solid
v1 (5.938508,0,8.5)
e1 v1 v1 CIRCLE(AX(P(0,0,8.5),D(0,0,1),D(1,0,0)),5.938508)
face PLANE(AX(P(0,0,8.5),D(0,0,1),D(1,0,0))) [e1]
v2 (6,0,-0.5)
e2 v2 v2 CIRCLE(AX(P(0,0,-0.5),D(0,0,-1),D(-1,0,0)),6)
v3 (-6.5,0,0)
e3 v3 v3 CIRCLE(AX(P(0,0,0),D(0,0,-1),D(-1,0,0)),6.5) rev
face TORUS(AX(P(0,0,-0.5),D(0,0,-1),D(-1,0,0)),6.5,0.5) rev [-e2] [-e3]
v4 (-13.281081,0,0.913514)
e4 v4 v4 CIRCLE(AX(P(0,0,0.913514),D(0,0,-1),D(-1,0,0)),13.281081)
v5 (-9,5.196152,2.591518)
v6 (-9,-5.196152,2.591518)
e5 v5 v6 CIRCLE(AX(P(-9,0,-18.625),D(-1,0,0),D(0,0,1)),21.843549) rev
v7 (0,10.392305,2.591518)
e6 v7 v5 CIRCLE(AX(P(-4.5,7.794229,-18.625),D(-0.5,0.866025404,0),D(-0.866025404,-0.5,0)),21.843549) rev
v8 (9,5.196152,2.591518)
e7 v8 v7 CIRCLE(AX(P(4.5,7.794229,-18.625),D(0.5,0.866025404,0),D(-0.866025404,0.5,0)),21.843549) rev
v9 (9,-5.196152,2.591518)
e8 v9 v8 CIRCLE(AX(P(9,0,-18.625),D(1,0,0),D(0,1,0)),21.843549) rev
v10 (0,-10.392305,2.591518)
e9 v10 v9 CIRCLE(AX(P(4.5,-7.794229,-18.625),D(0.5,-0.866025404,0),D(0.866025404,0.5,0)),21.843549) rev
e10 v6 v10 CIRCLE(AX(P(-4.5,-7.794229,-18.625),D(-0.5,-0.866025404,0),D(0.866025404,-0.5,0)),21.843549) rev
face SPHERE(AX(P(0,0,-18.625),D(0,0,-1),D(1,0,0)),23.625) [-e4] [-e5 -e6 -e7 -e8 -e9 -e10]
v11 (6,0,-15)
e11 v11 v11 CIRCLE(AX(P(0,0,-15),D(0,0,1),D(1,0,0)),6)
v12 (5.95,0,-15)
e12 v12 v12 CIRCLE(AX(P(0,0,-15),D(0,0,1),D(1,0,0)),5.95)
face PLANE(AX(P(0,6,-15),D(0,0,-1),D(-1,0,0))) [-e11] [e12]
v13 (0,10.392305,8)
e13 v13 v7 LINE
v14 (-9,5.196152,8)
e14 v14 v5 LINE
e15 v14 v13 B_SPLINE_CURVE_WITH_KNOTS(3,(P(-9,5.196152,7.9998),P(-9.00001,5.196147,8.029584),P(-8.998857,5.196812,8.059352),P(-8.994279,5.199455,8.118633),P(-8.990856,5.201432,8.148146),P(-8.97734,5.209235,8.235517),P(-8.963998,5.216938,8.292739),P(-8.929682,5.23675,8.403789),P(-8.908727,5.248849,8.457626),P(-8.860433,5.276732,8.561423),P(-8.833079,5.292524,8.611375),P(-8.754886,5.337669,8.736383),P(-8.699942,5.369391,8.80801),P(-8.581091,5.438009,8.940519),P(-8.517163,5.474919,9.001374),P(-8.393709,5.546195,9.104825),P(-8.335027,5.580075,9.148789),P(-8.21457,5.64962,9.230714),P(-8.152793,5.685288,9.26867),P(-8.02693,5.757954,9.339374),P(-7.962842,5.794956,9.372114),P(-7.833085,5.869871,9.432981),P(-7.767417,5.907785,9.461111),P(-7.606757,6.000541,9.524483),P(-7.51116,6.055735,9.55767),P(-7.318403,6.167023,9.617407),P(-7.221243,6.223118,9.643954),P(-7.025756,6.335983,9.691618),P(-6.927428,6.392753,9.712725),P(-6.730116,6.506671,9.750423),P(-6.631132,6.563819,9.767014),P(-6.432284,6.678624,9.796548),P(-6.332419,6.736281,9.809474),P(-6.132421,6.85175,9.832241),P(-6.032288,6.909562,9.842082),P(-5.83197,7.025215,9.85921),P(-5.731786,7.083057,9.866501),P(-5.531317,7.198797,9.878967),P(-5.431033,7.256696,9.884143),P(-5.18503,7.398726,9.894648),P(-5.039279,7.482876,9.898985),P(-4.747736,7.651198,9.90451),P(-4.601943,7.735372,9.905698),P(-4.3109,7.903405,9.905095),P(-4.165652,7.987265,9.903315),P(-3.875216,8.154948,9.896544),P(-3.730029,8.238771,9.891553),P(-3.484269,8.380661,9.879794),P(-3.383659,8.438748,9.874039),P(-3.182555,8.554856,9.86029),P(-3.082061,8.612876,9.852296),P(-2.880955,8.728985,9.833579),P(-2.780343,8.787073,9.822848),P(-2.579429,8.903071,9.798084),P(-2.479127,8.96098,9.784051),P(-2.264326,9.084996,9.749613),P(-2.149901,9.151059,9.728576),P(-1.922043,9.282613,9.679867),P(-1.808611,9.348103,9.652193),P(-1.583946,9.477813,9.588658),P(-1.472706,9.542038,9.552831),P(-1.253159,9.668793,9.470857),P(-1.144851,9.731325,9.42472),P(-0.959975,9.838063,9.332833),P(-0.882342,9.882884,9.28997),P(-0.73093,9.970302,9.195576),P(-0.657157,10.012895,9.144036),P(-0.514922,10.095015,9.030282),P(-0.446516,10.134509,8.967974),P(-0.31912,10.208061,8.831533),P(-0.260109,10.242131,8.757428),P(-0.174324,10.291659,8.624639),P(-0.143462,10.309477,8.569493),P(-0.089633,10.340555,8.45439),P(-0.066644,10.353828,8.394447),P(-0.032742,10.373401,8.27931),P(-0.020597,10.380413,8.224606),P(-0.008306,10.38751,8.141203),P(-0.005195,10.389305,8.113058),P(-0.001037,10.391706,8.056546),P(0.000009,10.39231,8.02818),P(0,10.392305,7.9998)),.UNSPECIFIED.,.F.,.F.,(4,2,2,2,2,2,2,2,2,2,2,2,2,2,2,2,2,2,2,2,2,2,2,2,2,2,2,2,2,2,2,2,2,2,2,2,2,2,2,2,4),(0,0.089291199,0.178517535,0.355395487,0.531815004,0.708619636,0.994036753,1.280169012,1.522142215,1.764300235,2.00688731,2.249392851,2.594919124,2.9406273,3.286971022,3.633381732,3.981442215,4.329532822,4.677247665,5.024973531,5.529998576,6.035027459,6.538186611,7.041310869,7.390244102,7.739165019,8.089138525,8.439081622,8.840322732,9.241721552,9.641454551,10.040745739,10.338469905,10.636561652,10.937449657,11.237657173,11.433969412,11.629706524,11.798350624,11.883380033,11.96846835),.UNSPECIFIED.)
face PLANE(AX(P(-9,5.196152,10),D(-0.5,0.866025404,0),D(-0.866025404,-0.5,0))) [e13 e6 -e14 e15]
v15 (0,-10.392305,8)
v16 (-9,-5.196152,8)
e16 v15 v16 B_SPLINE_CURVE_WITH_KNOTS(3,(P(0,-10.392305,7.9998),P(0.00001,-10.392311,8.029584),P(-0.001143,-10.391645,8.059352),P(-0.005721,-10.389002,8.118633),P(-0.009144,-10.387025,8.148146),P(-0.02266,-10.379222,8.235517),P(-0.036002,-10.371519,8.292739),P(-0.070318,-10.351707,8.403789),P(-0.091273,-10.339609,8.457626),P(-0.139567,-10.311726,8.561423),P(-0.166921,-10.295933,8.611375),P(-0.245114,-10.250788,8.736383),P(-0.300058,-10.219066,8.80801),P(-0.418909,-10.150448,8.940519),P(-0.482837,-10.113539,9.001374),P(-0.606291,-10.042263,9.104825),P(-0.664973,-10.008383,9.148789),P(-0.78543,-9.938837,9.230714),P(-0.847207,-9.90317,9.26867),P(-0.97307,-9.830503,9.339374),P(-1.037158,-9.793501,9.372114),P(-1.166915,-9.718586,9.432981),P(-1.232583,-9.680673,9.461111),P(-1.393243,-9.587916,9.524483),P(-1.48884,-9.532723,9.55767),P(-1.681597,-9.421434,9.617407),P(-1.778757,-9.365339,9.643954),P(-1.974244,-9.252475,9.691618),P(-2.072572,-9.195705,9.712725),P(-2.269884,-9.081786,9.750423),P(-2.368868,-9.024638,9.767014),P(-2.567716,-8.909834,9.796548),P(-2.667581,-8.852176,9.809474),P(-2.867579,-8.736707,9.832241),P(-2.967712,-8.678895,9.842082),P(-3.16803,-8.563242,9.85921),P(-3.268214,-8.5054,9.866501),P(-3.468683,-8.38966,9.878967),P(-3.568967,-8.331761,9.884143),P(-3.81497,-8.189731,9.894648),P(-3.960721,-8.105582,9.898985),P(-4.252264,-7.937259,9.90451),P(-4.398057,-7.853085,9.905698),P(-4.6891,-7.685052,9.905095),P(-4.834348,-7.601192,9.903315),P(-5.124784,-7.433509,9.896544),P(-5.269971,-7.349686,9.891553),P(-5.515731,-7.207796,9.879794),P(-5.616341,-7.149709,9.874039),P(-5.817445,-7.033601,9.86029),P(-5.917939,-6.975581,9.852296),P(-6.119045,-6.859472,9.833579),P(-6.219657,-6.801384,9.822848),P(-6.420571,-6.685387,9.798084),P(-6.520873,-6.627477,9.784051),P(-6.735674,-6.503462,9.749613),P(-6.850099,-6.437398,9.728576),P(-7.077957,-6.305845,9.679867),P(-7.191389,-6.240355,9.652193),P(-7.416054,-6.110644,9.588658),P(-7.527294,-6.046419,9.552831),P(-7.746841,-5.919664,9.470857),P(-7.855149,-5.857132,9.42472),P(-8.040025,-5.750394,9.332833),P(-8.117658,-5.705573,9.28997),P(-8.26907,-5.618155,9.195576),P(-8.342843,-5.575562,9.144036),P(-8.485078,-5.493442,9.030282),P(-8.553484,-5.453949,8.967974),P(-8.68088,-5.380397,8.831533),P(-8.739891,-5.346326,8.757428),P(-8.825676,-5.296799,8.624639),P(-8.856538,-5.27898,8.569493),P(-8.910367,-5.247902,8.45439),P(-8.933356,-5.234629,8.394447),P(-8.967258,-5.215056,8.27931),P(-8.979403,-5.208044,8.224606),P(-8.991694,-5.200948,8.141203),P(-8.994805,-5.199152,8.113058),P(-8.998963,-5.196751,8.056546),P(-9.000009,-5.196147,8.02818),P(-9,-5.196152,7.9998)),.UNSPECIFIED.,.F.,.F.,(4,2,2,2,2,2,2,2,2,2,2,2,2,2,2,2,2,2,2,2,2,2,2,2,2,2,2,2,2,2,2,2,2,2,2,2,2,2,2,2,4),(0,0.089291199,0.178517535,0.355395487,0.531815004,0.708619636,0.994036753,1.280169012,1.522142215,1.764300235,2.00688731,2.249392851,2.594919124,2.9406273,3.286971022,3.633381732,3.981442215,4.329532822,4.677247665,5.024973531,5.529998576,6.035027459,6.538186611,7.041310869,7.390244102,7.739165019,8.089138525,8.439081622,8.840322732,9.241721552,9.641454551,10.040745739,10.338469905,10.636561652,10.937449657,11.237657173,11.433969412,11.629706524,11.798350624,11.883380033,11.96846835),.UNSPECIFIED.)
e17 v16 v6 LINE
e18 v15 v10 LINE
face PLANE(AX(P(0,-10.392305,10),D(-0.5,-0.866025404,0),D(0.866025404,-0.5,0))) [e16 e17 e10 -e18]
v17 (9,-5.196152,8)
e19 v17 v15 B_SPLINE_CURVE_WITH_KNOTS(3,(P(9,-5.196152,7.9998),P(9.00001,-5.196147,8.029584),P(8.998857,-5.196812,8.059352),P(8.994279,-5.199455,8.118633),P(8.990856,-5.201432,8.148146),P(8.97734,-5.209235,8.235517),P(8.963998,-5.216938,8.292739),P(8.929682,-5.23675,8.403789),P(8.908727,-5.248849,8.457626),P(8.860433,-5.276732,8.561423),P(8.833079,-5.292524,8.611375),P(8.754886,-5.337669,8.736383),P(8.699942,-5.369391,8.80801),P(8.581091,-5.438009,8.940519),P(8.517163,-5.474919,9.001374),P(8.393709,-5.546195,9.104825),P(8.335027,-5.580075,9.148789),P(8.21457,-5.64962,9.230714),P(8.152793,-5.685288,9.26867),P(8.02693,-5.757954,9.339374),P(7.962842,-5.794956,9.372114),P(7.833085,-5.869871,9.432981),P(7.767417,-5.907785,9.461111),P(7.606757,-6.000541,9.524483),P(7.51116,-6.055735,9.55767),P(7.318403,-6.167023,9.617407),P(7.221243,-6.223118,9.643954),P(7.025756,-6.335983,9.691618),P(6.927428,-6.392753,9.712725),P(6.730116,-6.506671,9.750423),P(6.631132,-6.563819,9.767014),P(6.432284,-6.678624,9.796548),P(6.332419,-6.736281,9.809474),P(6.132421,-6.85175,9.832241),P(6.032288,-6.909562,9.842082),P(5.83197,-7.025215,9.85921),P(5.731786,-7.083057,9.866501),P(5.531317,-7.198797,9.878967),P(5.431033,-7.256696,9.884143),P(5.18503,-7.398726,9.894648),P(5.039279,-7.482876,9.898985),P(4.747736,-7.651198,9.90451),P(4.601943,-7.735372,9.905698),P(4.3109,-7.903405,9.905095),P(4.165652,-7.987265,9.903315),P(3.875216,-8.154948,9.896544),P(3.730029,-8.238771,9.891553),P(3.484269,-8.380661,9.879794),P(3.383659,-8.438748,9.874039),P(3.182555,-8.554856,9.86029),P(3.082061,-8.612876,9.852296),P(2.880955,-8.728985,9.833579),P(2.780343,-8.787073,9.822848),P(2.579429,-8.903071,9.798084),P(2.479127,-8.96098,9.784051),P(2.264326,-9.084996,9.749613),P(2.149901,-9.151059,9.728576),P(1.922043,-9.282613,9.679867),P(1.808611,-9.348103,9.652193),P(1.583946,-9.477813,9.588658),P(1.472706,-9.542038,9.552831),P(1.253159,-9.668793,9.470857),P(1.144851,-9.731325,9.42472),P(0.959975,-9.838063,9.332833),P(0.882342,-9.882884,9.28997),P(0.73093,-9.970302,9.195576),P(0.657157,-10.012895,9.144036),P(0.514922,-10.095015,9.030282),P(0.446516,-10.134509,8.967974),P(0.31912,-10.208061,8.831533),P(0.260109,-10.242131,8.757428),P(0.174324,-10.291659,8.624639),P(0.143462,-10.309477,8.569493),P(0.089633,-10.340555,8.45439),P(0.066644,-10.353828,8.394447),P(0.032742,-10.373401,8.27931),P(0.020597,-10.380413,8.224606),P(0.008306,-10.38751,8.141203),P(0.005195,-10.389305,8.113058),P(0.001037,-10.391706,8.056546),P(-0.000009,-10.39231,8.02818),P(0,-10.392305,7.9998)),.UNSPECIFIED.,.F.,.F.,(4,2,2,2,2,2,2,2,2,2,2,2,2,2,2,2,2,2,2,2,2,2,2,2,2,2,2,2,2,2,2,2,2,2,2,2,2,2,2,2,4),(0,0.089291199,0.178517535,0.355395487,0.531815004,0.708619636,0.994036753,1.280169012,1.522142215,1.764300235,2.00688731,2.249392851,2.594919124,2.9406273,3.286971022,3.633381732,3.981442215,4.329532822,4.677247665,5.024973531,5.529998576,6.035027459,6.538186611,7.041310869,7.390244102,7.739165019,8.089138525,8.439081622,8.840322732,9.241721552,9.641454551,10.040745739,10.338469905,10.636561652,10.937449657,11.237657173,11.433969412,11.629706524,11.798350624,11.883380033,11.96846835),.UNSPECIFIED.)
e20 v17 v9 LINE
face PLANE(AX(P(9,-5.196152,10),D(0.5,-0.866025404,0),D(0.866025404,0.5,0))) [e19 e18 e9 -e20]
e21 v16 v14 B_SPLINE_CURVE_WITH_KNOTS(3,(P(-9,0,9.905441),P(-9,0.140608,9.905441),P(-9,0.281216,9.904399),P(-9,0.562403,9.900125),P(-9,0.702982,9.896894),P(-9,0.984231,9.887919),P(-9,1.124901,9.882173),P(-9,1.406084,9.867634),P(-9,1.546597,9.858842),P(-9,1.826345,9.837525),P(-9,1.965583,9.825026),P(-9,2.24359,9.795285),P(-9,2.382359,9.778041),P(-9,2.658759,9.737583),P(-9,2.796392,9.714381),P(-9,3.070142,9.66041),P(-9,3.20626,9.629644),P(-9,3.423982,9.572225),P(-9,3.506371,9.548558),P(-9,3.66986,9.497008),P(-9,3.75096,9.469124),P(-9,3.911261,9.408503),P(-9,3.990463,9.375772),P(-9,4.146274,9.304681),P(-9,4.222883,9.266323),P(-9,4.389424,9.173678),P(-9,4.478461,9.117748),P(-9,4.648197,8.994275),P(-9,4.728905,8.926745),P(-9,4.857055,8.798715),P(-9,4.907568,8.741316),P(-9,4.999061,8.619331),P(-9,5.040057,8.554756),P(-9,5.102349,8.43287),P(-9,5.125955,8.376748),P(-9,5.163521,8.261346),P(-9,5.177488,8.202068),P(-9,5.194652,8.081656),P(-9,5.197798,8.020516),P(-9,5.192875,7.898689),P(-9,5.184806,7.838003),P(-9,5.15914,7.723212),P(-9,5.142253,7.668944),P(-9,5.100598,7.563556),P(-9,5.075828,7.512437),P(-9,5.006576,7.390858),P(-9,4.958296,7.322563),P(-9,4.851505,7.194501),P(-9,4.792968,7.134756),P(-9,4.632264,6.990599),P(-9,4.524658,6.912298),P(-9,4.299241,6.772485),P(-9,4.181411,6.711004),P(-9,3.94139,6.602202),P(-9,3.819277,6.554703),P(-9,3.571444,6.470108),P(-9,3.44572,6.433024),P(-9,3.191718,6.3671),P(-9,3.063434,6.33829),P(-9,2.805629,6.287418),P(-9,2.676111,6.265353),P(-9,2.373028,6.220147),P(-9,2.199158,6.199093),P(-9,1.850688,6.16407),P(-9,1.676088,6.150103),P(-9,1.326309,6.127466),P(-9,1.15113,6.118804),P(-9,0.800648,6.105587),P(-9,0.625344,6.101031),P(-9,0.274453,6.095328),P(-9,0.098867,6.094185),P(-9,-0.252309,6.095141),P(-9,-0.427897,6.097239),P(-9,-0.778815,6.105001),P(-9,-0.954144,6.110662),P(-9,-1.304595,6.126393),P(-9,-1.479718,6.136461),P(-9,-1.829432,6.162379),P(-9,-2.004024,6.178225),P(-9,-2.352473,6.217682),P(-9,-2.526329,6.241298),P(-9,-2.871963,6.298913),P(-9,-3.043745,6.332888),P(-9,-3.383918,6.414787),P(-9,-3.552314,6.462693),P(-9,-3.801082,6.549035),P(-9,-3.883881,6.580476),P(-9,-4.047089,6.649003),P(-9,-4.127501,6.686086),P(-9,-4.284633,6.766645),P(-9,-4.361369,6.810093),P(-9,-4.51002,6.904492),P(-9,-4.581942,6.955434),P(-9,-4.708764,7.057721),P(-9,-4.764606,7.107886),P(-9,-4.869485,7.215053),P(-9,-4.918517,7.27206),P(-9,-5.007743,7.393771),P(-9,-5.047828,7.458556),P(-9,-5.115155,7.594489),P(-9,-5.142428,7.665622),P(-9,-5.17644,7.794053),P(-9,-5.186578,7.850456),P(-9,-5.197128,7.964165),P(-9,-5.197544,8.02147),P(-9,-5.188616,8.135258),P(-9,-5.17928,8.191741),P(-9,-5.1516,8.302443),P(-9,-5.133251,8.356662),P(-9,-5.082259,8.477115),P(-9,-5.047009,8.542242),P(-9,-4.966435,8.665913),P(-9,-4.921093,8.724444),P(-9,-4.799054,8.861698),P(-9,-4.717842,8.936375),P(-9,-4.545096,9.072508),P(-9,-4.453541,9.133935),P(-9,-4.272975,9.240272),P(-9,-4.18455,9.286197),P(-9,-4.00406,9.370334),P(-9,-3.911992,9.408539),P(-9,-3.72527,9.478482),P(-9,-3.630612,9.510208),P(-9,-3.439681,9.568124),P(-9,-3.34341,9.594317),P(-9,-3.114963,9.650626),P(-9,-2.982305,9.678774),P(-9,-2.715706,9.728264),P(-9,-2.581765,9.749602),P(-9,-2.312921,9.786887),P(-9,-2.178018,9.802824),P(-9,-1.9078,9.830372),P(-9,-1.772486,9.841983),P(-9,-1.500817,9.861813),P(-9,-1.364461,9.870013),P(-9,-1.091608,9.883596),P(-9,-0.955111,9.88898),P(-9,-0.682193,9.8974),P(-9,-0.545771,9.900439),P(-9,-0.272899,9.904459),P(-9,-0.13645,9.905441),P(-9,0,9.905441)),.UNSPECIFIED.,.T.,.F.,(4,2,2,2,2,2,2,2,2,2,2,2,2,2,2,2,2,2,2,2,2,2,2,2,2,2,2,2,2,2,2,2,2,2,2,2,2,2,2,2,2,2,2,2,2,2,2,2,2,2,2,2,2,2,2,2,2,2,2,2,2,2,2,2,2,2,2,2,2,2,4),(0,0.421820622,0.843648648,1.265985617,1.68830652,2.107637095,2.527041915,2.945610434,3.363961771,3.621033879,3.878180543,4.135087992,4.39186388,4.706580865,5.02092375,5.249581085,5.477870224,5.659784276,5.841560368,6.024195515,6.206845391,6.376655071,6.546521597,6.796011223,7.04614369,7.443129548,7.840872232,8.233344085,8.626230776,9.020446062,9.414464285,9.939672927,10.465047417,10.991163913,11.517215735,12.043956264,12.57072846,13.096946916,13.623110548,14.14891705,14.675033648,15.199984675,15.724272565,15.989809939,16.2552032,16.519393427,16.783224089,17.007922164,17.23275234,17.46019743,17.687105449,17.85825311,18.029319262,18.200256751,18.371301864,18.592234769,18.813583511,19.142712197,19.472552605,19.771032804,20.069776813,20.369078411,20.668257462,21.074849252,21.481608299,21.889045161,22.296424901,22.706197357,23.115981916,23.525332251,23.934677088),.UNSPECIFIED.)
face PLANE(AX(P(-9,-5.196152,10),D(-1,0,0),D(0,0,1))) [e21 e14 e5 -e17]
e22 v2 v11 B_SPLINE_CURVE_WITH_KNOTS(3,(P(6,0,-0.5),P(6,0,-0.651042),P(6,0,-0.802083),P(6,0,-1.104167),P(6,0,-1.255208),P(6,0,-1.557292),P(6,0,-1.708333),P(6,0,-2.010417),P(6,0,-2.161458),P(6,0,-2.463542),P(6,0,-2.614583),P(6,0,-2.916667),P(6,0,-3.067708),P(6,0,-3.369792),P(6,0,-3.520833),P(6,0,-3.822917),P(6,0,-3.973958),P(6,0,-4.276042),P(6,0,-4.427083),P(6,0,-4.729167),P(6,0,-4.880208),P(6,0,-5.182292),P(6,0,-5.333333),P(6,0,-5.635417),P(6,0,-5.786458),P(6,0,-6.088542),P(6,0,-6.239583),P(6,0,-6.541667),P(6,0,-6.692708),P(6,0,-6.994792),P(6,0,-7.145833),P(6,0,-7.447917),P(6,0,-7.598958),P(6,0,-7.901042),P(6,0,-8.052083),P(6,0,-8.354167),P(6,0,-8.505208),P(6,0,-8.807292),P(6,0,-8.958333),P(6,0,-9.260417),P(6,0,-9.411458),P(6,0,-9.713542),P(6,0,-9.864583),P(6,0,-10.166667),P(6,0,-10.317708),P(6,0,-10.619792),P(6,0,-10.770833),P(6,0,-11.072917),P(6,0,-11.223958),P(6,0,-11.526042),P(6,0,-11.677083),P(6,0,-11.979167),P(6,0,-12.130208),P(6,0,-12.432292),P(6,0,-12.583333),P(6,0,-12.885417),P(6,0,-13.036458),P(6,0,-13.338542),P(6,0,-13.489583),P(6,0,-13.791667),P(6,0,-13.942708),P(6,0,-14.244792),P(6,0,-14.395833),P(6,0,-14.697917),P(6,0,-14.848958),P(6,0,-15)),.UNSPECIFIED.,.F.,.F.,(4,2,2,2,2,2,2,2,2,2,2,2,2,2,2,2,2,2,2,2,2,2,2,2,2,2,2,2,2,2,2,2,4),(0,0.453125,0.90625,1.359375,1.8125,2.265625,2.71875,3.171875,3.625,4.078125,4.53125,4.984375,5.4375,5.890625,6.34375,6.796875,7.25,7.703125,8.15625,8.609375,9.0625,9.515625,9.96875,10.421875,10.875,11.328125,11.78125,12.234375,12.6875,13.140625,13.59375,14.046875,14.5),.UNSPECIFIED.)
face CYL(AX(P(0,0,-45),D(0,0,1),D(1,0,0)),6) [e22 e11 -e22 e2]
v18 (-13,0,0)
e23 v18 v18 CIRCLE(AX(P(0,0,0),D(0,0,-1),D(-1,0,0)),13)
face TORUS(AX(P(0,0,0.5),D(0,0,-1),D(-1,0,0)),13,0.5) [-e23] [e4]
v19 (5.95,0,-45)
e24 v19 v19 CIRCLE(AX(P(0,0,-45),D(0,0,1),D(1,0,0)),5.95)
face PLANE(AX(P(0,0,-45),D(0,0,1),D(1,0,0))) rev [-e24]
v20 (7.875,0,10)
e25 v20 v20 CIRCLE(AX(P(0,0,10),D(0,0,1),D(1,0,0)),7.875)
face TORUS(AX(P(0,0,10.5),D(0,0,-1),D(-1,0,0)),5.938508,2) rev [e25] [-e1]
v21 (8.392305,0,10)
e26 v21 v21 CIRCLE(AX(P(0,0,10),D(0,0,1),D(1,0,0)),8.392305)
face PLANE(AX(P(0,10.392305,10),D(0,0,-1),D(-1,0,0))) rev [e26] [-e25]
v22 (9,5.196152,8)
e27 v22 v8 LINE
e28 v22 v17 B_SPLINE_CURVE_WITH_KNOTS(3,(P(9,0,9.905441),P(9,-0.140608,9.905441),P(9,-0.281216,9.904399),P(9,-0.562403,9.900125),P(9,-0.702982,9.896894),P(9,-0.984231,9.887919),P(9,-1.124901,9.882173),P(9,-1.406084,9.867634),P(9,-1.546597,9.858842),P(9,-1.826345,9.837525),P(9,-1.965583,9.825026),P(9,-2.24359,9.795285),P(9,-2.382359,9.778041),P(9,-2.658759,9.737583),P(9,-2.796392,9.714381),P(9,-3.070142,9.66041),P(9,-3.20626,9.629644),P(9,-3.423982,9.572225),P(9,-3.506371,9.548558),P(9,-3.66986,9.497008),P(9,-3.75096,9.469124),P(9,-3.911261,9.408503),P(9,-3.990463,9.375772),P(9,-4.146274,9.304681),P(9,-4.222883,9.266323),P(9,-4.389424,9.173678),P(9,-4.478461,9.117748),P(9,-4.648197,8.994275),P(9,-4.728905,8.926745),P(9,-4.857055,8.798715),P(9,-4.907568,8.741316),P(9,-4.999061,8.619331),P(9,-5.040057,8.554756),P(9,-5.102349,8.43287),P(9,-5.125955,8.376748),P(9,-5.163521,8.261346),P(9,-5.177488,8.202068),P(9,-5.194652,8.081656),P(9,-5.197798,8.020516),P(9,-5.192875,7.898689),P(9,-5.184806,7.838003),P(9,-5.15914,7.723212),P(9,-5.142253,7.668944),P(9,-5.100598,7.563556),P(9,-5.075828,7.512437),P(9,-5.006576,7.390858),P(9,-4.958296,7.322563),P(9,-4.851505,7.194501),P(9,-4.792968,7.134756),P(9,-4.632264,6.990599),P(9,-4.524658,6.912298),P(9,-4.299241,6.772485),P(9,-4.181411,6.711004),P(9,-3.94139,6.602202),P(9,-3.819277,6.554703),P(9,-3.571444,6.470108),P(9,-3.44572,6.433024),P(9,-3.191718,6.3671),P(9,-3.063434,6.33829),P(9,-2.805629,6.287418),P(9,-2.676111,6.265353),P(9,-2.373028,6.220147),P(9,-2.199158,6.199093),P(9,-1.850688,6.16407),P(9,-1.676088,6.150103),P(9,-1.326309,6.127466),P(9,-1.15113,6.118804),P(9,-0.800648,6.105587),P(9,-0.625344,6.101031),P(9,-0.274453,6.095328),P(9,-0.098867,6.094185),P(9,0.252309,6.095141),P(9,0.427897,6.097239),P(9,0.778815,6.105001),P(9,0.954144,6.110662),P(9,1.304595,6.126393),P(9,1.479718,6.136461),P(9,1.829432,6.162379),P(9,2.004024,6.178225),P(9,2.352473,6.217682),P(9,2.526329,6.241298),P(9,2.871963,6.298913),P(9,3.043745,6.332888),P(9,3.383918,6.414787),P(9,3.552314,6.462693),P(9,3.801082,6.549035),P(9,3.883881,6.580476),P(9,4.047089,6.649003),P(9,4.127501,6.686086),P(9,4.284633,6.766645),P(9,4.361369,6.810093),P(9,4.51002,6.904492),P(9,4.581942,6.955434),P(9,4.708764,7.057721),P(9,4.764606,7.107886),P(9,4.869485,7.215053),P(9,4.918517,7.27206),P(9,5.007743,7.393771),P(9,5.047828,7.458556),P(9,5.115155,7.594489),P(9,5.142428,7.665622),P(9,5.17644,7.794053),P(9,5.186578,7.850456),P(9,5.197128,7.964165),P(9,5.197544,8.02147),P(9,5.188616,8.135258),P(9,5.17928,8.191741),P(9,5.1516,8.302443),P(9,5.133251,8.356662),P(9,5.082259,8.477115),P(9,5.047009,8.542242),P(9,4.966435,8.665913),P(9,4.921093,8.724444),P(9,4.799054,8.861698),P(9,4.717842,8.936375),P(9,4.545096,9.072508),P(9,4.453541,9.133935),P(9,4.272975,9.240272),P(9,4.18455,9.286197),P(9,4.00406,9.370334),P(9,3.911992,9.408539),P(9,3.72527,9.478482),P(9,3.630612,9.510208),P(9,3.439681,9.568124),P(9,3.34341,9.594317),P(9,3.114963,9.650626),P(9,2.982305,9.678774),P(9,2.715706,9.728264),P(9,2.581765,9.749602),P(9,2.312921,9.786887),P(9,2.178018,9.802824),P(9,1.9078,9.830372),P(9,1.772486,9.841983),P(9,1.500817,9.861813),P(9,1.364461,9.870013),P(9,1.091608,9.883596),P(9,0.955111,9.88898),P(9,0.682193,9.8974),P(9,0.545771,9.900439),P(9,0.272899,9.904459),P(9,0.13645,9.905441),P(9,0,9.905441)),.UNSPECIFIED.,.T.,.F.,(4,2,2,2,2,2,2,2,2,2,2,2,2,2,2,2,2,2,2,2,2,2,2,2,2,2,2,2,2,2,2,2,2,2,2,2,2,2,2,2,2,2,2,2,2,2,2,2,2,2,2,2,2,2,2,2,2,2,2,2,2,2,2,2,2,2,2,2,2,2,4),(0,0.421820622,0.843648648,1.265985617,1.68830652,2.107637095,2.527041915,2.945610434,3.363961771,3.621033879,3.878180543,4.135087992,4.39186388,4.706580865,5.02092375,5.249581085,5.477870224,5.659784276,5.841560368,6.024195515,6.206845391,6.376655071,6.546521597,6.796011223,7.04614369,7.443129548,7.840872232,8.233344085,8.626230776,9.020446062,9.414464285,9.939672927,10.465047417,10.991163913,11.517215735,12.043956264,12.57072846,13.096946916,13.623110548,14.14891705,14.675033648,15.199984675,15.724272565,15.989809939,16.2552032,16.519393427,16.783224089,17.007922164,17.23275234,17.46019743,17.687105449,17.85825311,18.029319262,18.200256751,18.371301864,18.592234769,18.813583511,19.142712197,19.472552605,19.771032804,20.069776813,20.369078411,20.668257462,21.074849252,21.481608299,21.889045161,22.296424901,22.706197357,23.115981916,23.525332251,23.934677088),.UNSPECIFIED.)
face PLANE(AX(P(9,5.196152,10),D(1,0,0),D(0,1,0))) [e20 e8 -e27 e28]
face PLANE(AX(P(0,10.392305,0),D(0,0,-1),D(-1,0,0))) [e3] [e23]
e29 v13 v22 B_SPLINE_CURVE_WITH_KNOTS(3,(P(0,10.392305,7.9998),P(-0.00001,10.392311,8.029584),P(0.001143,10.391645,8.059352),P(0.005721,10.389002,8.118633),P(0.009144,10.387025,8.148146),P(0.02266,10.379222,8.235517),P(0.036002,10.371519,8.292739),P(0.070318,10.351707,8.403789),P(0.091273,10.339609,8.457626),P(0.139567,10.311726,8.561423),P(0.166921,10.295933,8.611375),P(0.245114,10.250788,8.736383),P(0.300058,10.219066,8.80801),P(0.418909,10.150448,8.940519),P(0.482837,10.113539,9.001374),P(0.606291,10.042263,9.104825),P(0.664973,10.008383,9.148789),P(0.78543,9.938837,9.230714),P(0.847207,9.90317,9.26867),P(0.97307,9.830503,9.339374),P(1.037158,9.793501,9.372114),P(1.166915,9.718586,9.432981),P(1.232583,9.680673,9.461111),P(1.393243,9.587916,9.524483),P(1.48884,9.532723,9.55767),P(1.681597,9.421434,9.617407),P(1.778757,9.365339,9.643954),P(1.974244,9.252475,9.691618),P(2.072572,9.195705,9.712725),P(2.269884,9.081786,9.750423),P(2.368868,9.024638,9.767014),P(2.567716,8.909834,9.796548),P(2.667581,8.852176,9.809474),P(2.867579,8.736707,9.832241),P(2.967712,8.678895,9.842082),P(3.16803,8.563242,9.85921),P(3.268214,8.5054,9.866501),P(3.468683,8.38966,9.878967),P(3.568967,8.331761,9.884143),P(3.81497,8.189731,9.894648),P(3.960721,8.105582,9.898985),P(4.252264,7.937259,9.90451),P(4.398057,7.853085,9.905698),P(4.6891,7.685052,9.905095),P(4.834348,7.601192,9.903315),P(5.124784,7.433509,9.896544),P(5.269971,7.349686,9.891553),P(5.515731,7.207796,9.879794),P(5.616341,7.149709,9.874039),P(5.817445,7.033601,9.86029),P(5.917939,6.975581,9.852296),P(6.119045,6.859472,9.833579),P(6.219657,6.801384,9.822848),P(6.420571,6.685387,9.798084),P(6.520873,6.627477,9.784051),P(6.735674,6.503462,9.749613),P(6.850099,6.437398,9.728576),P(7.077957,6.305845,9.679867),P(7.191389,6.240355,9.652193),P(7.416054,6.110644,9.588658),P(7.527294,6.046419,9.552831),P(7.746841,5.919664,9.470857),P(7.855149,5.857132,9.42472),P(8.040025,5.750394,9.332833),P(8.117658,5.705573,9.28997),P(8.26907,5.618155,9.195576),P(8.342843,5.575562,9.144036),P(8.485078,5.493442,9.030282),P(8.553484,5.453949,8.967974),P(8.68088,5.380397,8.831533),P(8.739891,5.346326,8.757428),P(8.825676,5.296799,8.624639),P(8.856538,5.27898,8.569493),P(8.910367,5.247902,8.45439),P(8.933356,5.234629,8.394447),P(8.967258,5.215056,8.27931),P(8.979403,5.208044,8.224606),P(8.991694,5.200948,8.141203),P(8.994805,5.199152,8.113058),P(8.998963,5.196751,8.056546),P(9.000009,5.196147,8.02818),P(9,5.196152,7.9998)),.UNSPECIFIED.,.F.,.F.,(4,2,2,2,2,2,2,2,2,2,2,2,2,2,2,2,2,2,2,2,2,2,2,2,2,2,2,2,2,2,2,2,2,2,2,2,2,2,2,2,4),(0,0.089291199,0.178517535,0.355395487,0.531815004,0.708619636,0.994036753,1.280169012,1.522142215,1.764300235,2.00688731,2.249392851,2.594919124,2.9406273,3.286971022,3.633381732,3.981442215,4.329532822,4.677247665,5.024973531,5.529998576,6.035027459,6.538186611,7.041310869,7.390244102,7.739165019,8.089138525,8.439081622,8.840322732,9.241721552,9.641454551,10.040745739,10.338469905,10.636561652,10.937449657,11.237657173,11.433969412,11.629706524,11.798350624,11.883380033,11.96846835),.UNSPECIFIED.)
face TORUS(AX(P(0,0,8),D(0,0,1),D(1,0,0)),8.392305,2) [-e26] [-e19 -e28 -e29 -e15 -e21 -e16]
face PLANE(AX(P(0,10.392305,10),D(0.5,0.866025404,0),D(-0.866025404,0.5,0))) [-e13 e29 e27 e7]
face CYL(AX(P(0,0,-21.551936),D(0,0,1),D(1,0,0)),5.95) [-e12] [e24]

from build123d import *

# Parameters (mm, degrees)
HEAD_DEPTH     = 10
SHANK_SKETCH_R = 6
SHANK_DEPTH    = 45
SKETCH6_R      = 7.875
HEAD_CUT_DEPTH = 1.5
FILLET1_R      = 2
FILLET2_R      = 0.5
THREAD_END_W   = 30
THREAD_END_H   = 0.05


with BuildPart() as part:
    # Head Sketch → Head (new body)
    with BuildSketch(Plane.XY):
        Polygon((0, 10.392304845), (9, 5.196152423), (9, -5.196152423), (0, -10.392304845), (-9, -5.196152423), (-9, 5.196152423), align=None)
    extrude(amount=HEAD_DEPTH)

    # Shank Sketch → Shank (add)
    with BuildSketch(Plane.XY):
        Circle(SHANK_SKETCH_R)
    extrude(amount=-SHANK_DEPTH)

    # Sketch3 → Flange (revolve)
    with BuildSketch(Plane(origin=(0, 0, 0), x_dir=(-1, 0, 0), z_dir=(0, 1, 0)), mode=Mode.PRIVATE) as flange_sk:
        with BuildLine():
            Line((-13, 0), (0, 0))
            Line((0, 0), (0, 5))
            ThreePointArc((0, 5), (-6.947778179, 3.955279081), (-13.281081081, 0.913513514))
            ThreePointArc((-13.281081081, 0.913513514), (-13.477889504, 0.352957076), (-13, 0))
        make_face()
    revolve(flange_sk.sketch.rotate(Axis((0, 0, 0), (0, 0, 1)), 30), axis=Axis((0, 0, 0), (0, 0, 1)))

    # Sketch5 → Head Trim (revolve, cut)
    with BuildSketch(Plane(origin=(0, 0, 0), x_dir=(0, 0, -1), z_dir=(1, 0, 0)), mode=Mode.PRIVATE) as head_trim_sk:
        with BuildLine():
            Line((-10, -8.392304845), (-10, -10.392304845))
            Line((-10, -10.392304845), (-8, -10.392304845))
            ThreePointArc((-8, -10.392304845), (-9.414213562, -9.806518408), (-10, -8.392304845))
        make_face()
    revolve(head_trim_sk.sketch.rotate(Axis((0, 0, 15.085599173), (0, 0, -1)), 90), axis=Axis((0, 0, 15.085599173), (0, 0, -1)), mode=Mode.SUBTRACT)

    # Sketch6 → Head Cut (cut)
    with BuildSketch(Plane.XY.offset(10)):
        Circle(SKETCH6_R)
    extrude(amount=-HEAD_CUT_DEPTH, mode=Mode.SUBTRACT)

    # Fillet1
    # the kernel refuses this fillet: 2 mm, written as the material it adds along each edge
    with BuildSketch(Plane(origin=(0, 0, 8.5), x_dir=(1, 0, 0), z_dir=(0, -1, 0))) as fillet1_piece_1:
        with BuildLine():
            CenterArc((5.938508327, 2), FILLET1_R, 270, 75.522487814)
            Line((5.938508327, 0), (5.938508327, -0.04))
            Line((5.938508327, -0.04), (7.875, -0.04))
            Line((7.875, -0.04), (7.915, 0))
            ThreePointArc((7.915, 0), (7.915, 0.75), (7.913729833, 1.49))
            Line((7.913729833, 1.49), (7.875, 1.5))
        make_face()
    revolve(axis=Axis((0, 0, 8.5), (0, 0, 1)))

    # Fillet2
    fillet2_edges = [part.edges().sort_by_distance(p)[0] for p in [
        (-6, 0, 0),
    ]]
    fillet(fillet2_edges, radius=FILLET2_R)

    # Thread End → Thread Cut (revolve, cut)
    with BuildSketch(Plane(origin=(0, 0, 0), x_dir=(0, 0, -1), z_dir=(1, 0, 0)), mode=Mode.PRIVATE) as thread_cut_sk:
        with Locations((30, 5.975)):
            Rectangle(THREAD_END_W, THREAD_END_H)
    revolve(thread_cut_sk.sketch.rotate(Axis((0, 0, -21.551935625), (0, 0, -1)), 90), axis=Axis((0, 0, -21.551935625), (0, 0, -1)), mode=Mode.SUBTRACT)


solid = part.part
